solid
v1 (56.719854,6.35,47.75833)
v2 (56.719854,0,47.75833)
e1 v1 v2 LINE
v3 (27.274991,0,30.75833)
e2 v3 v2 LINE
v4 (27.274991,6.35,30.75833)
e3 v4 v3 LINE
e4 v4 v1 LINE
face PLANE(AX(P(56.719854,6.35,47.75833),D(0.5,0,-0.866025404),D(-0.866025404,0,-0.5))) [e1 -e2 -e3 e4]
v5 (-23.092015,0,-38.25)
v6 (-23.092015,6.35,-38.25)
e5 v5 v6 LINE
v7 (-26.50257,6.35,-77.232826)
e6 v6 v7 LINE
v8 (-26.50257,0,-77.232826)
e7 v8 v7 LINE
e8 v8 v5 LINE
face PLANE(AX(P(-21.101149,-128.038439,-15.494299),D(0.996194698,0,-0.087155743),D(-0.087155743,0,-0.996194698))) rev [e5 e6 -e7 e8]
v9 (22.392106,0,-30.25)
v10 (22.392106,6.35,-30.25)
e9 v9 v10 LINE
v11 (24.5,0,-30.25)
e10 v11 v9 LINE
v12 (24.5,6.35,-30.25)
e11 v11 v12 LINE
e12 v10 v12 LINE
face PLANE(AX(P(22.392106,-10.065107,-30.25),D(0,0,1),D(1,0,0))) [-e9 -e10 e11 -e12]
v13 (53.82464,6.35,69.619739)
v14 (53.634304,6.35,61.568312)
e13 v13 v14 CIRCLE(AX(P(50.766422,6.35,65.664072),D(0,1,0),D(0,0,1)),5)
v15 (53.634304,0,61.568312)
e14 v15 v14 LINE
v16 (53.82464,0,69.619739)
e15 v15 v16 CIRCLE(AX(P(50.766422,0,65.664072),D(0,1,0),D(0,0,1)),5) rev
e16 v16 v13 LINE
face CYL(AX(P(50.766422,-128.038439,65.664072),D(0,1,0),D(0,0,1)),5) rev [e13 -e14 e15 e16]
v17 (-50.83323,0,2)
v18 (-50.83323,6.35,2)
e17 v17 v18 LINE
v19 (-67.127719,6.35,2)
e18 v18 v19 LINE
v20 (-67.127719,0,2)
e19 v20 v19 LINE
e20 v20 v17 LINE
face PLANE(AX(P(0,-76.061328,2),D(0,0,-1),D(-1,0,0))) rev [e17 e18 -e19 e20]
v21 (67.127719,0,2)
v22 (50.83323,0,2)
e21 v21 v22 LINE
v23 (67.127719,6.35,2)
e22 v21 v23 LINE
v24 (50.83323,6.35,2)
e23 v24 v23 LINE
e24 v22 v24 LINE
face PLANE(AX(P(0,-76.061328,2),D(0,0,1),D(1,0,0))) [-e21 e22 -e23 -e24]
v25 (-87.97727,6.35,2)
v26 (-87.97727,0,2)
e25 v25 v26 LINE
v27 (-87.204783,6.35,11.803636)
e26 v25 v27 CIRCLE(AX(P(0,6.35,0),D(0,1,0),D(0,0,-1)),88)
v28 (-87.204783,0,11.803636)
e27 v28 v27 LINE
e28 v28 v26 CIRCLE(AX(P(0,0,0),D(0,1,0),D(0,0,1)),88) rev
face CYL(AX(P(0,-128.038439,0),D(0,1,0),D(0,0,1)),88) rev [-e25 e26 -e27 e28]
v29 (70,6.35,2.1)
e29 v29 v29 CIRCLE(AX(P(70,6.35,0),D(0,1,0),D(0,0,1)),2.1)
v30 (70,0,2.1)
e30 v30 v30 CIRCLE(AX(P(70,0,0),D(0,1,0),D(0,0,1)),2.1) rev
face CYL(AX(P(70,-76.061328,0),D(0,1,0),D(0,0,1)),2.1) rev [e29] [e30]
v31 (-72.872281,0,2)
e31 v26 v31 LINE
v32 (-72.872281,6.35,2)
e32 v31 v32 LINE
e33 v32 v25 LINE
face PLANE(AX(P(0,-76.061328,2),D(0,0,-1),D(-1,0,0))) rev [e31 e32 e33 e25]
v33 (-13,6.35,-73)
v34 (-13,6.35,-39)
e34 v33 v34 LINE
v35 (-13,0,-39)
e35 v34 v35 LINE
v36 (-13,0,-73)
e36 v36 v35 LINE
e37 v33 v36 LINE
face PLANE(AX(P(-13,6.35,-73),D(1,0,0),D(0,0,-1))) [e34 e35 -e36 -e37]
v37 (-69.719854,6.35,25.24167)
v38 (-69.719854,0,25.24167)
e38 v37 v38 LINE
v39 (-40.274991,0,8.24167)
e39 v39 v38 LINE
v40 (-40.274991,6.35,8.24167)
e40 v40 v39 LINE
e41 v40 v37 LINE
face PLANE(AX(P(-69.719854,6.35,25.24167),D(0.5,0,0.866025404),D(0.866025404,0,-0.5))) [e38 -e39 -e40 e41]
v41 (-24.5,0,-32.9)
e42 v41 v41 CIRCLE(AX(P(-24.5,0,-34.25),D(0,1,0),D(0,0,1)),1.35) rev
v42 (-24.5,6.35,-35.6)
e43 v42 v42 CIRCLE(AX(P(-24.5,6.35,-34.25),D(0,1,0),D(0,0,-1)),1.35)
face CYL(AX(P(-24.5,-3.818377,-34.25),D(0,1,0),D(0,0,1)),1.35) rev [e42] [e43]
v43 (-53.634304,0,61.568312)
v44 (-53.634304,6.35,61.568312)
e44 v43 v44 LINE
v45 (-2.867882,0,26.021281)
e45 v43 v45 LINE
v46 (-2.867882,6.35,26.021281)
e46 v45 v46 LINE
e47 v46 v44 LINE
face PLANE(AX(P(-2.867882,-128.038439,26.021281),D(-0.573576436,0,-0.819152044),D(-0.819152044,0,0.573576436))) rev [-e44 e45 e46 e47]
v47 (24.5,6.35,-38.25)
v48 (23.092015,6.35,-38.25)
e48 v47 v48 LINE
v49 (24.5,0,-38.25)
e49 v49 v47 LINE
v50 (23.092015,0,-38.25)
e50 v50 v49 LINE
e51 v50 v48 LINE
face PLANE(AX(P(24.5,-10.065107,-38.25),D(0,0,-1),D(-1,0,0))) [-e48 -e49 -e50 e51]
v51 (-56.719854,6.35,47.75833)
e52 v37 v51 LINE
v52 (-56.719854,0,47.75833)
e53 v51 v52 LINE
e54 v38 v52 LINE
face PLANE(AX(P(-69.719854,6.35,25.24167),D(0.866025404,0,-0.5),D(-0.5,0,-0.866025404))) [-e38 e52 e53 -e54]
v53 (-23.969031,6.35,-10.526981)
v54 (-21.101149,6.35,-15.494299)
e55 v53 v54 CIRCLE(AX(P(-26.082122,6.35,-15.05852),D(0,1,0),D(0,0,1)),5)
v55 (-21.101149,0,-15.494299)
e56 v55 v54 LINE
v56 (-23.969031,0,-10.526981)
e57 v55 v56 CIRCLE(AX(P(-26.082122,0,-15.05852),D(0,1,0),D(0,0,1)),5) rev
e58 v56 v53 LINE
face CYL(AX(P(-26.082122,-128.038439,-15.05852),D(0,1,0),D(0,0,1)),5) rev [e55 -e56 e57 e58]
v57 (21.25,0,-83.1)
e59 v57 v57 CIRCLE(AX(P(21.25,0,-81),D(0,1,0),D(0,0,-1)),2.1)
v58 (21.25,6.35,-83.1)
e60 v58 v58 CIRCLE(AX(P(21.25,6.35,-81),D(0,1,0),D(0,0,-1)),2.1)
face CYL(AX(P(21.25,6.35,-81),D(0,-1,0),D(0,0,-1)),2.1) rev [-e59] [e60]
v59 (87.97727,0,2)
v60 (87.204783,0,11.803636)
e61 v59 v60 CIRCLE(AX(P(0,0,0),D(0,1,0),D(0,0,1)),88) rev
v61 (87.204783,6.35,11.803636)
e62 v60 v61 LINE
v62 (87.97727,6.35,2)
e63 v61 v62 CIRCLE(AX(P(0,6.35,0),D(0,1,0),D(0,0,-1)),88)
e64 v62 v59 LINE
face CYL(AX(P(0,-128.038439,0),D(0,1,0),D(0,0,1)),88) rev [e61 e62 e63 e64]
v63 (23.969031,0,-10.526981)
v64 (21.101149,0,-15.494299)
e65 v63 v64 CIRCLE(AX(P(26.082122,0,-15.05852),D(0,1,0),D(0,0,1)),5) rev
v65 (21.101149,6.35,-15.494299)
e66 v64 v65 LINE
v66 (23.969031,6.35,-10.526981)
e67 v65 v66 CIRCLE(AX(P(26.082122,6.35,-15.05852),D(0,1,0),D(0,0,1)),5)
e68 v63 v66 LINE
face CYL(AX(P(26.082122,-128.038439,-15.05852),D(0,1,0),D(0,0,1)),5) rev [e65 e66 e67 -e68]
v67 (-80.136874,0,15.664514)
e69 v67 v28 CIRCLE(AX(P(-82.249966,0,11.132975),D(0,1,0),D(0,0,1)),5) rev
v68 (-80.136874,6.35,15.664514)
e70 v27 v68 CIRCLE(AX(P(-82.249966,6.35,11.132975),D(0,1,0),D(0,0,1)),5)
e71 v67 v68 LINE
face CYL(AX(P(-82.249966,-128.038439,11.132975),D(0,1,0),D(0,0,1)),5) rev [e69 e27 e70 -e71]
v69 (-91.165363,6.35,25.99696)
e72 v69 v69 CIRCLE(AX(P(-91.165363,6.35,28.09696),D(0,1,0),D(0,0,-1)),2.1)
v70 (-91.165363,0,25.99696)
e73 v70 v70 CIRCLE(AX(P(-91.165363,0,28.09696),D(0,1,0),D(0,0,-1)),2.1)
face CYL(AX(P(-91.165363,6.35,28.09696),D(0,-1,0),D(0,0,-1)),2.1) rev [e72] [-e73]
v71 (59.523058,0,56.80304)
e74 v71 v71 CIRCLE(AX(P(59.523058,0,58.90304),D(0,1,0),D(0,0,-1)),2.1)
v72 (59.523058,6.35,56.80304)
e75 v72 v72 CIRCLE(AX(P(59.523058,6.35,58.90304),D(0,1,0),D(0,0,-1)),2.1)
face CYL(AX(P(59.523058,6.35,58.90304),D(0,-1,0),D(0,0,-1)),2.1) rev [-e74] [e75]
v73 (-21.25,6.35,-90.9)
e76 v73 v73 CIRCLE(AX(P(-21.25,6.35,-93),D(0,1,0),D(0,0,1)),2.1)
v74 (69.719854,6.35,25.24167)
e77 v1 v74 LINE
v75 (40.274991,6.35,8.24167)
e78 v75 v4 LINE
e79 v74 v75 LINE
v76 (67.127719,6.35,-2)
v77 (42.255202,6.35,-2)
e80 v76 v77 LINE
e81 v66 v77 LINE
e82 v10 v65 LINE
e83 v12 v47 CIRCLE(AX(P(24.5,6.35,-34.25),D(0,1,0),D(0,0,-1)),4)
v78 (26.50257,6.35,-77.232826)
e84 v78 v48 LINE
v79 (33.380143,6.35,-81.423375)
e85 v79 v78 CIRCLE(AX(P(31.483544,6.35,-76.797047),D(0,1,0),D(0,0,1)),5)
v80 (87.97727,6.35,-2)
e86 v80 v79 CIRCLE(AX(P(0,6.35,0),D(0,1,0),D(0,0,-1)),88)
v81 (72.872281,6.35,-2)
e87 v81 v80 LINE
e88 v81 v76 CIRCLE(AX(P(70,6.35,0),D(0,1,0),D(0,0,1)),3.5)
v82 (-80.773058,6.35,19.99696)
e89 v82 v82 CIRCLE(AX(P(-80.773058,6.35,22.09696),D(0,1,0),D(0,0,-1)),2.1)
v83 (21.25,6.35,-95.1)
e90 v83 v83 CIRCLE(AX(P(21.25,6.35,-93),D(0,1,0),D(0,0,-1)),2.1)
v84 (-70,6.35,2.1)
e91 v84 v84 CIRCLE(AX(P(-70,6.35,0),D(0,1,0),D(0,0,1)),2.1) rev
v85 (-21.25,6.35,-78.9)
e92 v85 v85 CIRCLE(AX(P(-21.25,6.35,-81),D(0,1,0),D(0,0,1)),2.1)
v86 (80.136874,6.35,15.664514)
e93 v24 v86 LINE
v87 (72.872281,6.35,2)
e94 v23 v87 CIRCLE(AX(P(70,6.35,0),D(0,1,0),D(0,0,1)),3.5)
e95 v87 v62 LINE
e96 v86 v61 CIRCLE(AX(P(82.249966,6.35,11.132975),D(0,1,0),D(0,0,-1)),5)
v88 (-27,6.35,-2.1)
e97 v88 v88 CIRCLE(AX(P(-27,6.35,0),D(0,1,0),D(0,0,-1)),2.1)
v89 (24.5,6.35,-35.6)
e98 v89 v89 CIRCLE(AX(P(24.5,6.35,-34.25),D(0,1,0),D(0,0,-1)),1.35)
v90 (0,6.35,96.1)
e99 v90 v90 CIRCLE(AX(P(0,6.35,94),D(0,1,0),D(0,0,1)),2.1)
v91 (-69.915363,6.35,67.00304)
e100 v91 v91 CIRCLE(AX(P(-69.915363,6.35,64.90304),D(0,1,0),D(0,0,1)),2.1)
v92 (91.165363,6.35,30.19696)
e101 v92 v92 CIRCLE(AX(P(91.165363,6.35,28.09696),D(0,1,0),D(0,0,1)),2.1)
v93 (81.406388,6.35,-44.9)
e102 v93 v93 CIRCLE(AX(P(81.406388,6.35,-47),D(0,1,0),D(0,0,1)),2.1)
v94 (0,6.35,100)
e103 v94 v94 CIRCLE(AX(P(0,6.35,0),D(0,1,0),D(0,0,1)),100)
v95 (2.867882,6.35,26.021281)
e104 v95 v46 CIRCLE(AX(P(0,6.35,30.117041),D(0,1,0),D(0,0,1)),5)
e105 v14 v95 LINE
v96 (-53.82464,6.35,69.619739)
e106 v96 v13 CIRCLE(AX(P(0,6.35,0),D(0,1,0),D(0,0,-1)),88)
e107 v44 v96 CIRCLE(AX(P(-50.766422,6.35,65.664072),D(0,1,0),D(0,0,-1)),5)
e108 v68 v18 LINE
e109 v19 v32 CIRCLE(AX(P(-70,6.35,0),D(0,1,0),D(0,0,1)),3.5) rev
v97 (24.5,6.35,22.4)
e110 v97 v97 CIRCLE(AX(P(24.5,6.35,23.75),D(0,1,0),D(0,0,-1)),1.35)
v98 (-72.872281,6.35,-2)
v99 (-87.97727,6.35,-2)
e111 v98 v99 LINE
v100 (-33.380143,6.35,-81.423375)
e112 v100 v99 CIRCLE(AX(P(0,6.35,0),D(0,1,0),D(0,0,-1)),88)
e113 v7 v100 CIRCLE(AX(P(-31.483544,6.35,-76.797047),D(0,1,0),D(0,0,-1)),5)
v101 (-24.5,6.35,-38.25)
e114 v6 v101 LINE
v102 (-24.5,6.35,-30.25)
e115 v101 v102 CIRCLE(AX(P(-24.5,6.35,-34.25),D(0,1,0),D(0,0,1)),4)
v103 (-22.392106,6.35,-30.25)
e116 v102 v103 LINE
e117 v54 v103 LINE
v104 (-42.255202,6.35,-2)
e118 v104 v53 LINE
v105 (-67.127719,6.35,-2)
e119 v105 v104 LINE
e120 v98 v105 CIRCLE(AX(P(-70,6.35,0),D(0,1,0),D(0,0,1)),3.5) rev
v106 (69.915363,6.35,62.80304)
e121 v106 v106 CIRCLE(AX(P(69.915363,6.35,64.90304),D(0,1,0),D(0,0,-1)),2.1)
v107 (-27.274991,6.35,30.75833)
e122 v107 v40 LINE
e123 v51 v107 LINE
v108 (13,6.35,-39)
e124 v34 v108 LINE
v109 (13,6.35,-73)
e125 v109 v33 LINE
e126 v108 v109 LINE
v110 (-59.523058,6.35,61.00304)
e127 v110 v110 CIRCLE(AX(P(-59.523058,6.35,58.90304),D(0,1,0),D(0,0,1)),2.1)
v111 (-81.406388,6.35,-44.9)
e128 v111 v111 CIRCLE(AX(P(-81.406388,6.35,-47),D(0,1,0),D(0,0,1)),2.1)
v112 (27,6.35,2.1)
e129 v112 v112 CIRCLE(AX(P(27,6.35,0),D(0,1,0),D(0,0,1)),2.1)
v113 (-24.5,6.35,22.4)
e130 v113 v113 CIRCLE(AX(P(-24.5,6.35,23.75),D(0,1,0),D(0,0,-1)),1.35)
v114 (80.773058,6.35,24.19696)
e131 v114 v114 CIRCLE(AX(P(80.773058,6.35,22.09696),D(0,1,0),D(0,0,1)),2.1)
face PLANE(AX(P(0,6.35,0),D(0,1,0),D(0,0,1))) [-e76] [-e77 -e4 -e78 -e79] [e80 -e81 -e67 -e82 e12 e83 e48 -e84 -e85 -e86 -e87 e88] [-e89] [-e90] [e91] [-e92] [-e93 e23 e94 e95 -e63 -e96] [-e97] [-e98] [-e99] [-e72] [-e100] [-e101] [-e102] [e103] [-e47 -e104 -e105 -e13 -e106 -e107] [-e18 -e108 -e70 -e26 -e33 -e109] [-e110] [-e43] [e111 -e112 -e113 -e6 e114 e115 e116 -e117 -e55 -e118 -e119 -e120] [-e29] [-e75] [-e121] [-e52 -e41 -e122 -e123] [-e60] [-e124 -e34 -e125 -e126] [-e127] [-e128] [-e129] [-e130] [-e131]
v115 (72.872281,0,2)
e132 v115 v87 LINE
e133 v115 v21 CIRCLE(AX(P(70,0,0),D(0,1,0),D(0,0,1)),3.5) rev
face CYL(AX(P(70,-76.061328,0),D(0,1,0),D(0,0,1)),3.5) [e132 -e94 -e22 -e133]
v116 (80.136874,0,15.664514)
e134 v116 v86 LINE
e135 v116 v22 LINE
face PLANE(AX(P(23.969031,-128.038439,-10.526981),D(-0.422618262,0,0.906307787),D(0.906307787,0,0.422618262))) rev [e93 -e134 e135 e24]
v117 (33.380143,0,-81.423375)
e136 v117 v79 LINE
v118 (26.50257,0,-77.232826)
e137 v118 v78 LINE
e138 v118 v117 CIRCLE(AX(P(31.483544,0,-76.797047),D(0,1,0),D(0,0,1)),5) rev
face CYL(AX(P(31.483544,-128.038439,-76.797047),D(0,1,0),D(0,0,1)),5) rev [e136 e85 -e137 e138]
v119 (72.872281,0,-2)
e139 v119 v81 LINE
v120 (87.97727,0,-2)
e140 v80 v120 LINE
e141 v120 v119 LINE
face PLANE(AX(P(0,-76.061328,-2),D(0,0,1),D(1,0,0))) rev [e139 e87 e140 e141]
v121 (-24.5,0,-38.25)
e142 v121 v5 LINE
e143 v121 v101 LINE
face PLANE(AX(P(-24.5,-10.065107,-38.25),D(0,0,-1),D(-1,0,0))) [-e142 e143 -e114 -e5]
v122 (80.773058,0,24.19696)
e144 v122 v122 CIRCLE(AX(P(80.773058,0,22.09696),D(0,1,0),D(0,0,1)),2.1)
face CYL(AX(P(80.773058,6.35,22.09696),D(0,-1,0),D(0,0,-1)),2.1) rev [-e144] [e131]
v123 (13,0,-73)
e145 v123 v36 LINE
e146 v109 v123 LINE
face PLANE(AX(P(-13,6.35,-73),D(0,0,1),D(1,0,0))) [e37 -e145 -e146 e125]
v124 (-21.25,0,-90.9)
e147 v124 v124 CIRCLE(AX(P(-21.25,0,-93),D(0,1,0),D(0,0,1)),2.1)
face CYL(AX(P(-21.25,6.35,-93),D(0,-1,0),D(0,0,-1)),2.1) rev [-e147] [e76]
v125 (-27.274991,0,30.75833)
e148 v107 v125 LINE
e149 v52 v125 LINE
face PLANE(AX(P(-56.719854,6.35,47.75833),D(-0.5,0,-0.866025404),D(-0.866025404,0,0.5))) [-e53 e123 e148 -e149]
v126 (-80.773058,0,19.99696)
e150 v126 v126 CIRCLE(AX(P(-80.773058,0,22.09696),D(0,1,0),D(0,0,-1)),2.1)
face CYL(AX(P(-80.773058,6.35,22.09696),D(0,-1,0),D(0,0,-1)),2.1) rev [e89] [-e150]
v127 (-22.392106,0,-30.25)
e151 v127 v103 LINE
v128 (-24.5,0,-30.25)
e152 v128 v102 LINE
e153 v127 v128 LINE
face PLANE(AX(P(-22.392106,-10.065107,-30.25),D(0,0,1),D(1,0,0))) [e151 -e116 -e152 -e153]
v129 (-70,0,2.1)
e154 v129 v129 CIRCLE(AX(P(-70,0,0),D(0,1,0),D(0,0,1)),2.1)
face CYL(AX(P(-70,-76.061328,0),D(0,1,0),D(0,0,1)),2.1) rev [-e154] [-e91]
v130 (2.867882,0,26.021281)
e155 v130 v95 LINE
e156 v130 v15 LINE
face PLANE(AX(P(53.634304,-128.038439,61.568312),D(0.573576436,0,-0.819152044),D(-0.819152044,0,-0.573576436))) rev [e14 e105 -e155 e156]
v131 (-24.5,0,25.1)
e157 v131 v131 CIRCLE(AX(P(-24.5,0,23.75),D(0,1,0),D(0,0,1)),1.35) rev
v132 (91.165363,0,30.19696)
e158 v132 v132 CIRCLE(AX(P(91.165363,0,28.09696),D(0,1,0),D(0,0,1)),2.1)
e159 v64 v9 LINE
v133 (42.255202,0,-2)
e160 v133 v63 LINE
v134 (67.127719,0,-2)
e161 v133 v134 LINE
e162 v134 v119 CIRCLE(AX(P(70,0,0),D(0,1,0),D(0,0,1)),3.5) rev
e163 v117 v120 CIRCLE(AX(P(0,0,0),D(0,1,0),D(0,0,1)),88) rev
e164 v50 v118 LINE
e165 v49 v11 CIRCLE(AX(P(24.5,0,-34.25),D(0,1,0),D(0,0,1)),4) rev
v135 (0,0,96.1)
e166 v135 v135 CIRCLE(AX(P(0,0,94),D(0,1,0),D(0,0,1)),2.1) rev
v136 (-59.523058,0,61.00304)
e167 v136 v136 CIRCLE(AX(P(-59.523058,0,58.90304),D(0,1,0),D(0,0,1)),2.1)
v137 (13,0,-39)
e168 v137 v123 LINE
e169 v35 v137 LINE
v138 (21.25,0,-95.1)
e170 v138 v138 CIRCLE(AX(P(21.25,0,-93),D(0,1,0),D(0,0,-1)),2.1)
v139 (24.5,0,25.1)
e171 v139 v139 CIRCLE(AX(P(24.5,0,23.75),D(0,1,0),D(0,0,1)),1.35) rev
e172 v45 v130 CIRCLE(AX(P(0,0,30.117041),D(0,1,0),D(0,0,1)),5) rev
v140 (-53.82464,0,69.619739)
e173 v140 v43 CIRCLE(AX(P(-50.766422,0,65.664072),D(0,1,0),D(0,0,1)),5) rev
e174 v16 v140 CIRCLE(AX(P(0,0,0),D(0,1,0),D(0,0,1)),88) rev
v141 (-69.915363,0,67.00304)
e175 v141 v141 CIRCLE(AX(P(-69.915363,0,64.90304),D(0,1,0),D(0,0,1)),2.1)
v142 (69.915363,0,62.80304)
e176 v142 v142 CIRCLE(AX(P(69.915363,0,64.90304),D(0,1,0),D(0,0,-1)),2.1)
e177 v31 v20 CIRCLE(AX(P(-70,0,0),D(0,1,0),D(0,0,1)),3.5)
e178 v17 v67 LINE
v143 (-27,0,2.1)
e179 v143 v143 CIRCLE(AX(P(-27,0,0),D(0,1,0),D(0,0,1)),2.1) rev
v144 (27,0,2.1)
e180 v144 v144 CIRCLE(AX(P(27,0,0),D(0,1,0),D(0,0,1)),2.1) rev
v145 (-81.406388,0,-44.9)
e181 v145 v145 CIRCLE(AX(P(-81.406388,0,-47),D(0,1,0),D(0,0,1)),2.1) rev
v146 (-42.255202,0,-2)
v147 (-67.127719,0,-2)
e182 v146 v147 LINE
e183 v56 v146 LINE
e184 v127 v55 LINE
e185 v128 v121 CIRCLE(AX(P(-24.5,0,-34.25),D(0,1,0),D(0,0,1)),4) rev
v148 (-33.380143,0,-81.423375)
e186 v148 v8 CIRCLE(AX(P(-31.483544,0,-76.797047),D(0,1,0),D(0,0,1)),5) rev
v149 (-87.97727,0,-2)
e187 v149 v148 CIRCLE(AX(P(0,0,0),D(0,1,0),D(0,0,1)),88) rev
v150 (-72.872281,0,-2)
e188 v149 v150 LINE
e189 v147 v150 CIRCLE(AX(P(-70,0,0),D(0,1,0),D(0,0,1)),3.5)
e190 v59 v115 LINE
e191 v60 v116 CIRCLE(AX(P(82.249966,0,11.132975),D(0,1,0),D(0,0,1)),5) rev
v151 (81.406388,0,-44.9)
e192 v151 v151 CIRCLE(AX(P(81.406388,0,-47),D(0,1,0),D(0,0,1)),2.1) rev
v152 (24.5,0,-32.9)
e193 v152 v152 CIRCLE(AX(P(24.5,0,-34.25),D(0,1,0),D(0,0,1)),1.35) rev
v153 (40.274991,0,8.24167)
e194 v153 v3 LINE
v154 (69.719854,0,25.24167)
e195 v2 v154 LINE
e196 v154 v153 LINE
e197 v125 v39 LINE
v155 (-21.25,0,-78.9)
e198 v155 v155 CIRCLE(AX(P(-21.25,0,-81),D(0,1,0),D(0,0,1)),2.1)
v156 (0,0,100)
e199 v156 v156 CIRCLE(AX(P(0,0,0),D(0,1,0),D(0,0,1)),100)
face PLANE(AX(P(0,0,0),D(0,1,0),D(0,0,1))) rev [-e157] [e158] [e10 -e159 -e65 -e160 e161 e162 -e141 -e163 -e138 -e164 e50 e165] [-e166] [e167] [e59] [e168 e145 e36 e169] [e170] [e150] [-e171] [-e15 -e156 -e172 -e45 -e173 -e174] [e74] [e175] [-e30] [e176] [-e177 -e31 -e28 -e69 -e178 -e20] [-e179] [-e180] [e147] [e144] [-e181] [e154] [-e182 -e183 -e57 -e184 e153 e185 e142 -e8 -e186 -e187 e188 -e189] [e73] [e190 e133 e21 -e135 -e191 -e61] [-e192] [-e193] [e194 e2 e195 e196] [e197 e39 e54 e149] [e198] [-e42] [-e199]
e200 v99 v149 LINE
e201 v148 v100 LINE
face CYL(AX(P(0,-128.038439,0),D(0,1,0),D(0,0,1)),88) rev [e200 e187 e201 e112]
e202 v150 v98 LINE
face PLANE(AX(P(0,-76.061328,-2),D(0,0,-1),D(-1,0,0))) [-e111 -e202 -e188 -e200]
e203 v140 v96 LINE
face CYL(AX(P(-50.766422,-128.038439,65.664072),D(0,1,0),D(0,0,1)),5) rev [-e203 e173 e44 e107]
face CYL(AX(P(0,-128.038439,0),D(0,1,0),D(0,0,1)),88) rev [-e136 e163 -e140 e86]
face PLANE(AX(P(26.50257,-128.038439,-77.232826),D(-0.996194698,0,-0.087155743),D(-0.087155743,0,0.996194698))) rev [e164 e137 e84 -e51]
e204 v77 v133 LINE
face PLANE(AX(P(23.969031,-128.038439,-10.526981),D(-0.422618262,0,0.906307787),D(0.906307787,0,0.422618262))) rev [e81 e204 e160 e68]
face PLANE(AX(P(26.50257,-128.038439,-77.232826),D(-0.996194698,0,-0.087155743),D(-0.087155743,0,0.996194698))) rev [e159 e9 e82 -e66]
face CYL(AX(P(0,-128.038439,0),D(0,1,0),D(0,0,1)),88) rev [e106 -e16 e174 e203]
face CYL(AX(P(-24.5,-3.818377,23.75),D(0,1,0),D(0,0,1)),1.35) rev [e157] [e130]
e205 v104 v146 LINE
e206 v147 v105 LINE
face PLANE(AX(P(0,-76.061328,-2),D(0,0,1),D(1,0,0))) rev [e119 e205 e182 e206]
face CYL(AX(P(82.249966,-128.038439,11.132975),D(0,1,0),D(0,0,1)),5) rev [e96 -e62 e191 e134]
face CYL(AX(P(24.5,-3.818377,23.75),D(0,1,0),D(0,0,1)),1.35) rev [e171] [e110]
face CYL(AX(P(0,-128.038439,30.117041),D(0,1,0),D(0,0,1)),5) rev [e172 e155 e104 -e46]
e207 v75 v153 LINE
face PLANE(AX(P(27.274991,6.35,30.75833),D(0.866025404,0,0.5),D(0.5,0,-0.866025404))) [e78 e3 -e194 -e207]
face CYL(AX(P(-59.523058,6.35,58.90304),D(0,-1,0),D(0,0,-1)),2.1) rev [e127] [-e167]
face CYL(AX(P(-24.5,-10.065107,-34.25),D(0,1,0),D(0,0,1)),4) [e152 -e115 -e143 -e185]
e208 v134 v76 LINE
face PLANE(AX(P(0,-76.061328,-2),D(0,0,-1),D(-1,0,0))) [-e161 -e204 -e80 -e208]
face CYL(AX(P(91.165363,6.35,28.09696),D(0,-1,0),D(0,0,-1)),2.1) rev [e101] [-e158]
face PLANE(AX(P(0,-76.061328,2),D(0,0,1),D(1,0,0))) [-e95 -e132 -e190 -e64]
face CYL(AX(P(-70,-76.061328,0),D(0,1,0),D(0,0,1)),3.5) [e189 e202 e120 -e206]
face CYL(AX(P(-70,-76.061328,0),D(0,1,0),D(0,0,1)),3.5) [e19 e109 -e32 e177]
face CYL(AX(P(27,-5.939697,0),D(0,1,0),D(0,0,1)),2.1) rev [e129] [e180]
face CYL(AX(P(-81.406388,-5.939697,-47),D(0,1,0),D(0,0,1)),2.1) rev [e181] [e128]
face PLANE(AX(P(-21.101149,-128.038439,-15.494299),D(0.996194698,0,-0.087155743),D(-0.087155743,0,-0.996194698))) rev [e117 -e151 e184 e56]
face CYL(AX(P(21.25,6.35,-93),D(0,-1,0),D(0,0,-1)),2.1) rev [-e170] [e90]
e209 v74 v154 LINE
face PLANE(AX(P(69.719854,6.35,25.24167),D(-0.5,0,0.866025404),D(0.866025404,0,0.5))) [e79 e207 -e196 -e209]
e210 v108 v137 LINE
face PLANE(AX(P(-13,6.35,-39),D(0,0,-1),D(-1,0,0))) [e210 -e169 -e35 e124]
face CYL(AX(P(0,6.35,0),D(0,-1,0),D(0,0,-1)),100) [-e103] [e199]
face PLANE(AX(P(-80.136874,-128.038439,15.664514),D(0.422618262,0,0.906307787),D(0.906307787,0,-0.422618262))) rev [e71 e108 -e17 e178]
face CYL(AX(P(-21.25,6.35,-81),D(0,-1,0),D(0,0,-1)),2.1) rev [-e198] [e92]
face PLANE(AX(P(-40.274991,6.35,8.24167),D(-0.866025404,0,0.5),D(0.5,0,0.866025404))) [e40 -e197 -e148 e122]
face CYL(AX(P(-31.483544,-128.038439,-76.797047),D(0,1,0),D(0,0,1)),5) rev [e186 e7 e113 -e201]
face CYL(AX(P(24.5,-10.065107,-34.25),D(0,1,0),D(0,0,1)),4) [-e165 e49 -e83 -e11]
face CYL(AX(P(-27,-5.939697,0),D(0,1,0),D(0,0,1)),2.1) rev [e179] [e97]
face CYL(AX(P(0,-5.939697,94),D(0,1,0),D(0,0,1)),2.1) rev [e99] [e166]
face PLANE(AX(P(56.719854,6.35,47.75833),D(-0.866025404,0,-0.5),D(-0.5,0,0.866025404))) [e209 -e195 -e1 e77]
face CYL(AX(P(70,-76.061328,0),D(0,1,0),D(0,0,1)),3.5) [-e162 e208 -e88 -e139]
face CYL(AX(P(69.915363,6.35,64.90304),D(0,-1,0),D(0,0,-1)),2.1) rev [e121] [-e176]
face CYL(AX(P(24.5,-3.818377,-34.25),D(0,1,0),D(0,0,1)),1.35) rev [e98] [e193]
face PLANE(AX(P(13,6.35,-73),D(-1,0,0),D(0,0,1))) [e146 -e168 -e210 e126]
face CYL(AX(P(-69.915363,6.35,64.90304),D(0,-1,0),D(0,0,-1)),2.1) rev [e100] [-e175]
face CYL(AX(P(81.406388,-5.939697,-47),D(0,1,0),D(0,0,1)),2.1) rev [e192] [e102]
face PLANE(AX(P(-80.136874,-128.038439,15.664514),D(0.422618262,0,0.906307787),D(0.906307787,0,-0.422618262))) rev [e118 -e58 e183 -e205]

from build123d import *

# Parameters (mm, degrees)
BOSS_EXTRUDE1_OUTLINE_R   = 100
BOSS_EXTRUDE1_OUTLINE_R_2 = 2.1
BOSS_EXTRUDE1_OUTLINE_W   = 26
BOSS_EXTRUDE1_OUTLINE_H   = 34
BOSS_EXTRUDE1_DEPTH       = 6.35
SKETCH2_R                 = 2.1
CUT_EXTRUDE1_DEPTH        = 6.35
CUT_EXTRUDE4_DEPTH        = 6.35
BOSS_EXTRUDE2_DEPTH       = 6.35
SKETCH4_R                 = 1.35
CUT_EXTRUDE3_DEPTH        = 6.35
SKETCH7_R                 = 2.1
BOSS_EXTRUDE3_DEPTH       = 6.35
SKETCH8_R                 = 2.1
CUT_EXTRUDE5_DEPTH        = 6.35


# Read off the part's stored shape, not the designer's step: Boss-Extrude1
with BuildPart() as part:
    # Boss-Extrude1 outline → Boss-Extrude1 (new body)
    with BuildSketch(Plane(origin=(0, 0, 0), x_dir=(1, 0, 0), z_dir=(0, 1, 0))):
        Circle(BOSS_EXTRUDE1_OUTLINE_R)
        with Locations((-69.915362552, -64.90303983)):
            Circle(BOSS_EXTRUDE1_OUTLINE_R_2, mode=Mode.SUBTRACT)
        with Locations((-59.523057707, -58.90303983)):
            Circle(BOSS_EXTRUDE1_OUTLINE_R_2, mode=Mode.SUBTRACT)
        with Locations((-91.165362552, -28.09696017)):
            Circle(BOSS_EXTRUDE1_OUTLINE_R_2, mode=Mode.SUBTRACT)
        with Locations((-80.773057707, -22.09696017)):
            Circle(BOSS_EXTRUDE1_OUTLINE_R_2, mode=Mode.SUBTRACT)
        Polygon((-56.719854476, -47.758330249), (-69.719854476, -25.241669751), (-40.274990748, -8.241669751), (-27.274990748, -30.758330249), align=None, mode=Mode.SUBTRACT)
        with Locations((69.915362552, -64.90303983)):
            Circle(BOSS_EXTRUDE1_OUTLINE_R_2, mode=Mode.SUBTRACT)
        with Locations((59.523057707, -58.90303983)):
            Circle(BOSS_EXTRUDE1_OUTLINE_R_2, mode=Mode.SUBTRACT)
        Polygon((69.719854476, -25.241669751), (56.719854476, -47.758330249), (27.274990748, -30.758330249), (40.274990748, -8.241669751), align=None, mode=Mode.SUBTRACT)
        with Locations((91.165362552, -28.09696017)):
            Circle(BOSS_EXTRUDE1_OUTLINE_R_2, mode=Mode.SUBTRACT)
        with Locations((80.773057707, -22.09696017)):
            Circle(BOSS_EXTRUDE1_OUTLINE_R_2, mode=Mode.SUBTRACT)
        with Locations((-21.25, 81)):
            Circle(BOSS_EXTRUDE1_OUTLINE_R_2, mode=Mode.SUBTRACT)
        with Locations((-21.25, 93)):
            Circle(BOSS_EXTRUDE1_OUTLINE_R_2, mode=Mode.SUBTRACT)
        with Locations((0, 56)):
            Rectangle(BOSS_EXTRUDE1_OUTLINE_W, BOSS_EXTRUDE1_OUTLINE_H, mode=Mode.SUBTRACT)
        with Locations((21.25, 81)):
            Circle(BOSS_EXTRUDE1_OUTLINE_R_2, mode=Mode.SUBTRACT)
        with Locations((21.25, 93)):
            Circle(BOSS_EXTRUDE1_OUTLINE_R_2, mode=Mode.SUBTRACT)
    extrude(amount=BOSS_EXTRUDE1_DEPTH)

    # Sketch2 → Cut-Extrude1 (cut)
    with BuildSketch(Plane(origin=(0, 6.35, 0), x_dir=(1, 0, 0), z_dir=(0, 1, 0))):
        with Locations(Location((0, -94, 0), (0, 0, 270))):
            Circle(SKETCH2_R)
        with Locations(Location((-81.406387956, 47, 0), (0, 0, 270))):
            Circle(SKETCH2_R)
        with Locations(Location((81.406387956, 47, 0), (0, 0, 270))):
            Circle(SKETCH2_R)
    extrude(amount=-CUT_EXTRUDE1_DEPTH, mode=Mode.SUBTRACT)

    # Sketch5 → Cut-Extrude4 (cut)
    with BuildSketch(Plane(origin=(0, 6.35, 0), x_dir=(1, 0, 0), z_dir=(0, 1, 0))):
        with BuildLine():
            Line((26.502570178, 77.23282604), (21.101148971, 15.494299138))
            ThreePointArc((21.101148971, 15.494299138), (21.751995443, 12.558520424), (23.969031153, 10.526981489))
            Line((23.969031153, 10.526981489), (80.136874446, -15.664513981))
            ThreePointArc((80.136874446, -15.664513981), (84.646931723, -15.520976202), (87.204782969, -11.803636193))
            ThreePointArc((87.204782969, -11.803636193), (76.210235533, 44), (33.380142684, 81.423375479))
            ThreePointArc((33.380142684, 81.423375479), (28.881906179, 81.066881325), (26.502570178, 77.23282604))
        make_face()
        with BuildLine():
            Line((53.634304268, -61.56831206), (2.867882182, -26.021280627))
            ThreePointArc((2.867882182, -26.021280627), (0, -25.117040848), (-2.867882182, -26.021280627))
            Line((-2.867882182, -26.021280627), (-53.634304268, -61.56831206))
            ThreePointArc((-53.634304268, -61.56831206), (-55.765025544, -65.545905124), (-53.824640284, -69.619739286))
            ThreePointArc((-53.824640284, -69.619739286), (0, -88), (53.824640284, -69.619739286))
            ThreePointArc((53.824640284, -69.619739286), (55.765025544, -65.545905124), (53.634304268, -61.56831206))
        make_face()
        with BuildLine():
            Line((-80.136874446, -15.664513981), (-23.969031153, 10.526981489))
            ThreePointArc((-23.969031153, 10.526981489), (-21.751995443, 12.558520424), (-21.101148971, 15.494299138))
            Line((-21.101148971, 15.494299138), (-26.502570178, 77.23282604))
            ThreePointArc((-26.502570178, 77.23282604), (-28.881906179, 81.066881325), (-33.380142684, 81.423375479))
            ThreePointArc((-33.380142684, 81.423375479), (-76.210235533, 44), (-87.204782969, -11.803636193))
            ThreePointArc((-87.204782969, -11.803636193), (-84.646931723, -15.520976202), (-80.136874446, -15.664513981))
        make_face()
    extrude(amount=-CUT_EXTRUDE4_DEPTH, mode=Mode.SUBTRACT)

    # Sketch6 → Boss-Extrude2 (add)
    with BuildSketch(Plane(origin=(0, 6.35, 0), x_dir=(1, 0, 0), z_dir=(0, 1, 0))):
        with BuildLine():
            Line((-24.5, 38.25), (-23.092014827, 38.25))
            Line((-23.092014827, 38.25), (-22.392105519, 30.25))
            Line((-22.392105519, 30.25), (-24.5, 30.25))
            ThreePointArc((-24.5, 30.25), (-28.5, 34.25), (-24.5, 38.25))
        make_face()
        with BuildLine():
            Line((22.392105519, 30.25), (24.5, 30.25))
            ThreePointArc((24.5, 30.25), (28.5, 34.25), (24.5, 38.25))
            Line((24.5, 38.25), (23.092014827, 38.25))
            Line((23.092014827, 38.25), (22.392105519, 30.25))
        make_face()
    extrude(amount=-BOSS_EXTRUDE2_DEPTH)

    # Sketch4 → Cut-Extrude3 (cut)
    with BuildSketch(Plane(origin=(0, 6.35, 0), x_dir=(1, 0, 0), z_dir=(0, 1, 0))):
        with Locations(Location((-24.5, -23.75, 0), (0, 0, 270))):
            Circle(SKETCH4_R)
        with Locations(Location((24.5, -23.75, 0), (0, 0, 270))):
            Circle(SKETCH4_R)
        with Locations(Location((24.5, 34.25, 0), (0, 0, 270))):
            Circle(SKETCH4_R)
        with Locations(Location((-24.5, 34.25, 0), (0, 0, 270))):
            Circle(SKETCH4_R)
    extrude(amount=-CUT_EXTRUDE3_DEPTH, mode=Mode.SUBTRACT)

    # Sketch7 → Boss-Extrude3 (add)
    # profile 1 of 2: a face of its own
    with BuildSketch(Plane(origin=(0, 6.35, 0), x_dir=(1, 0, 0), z_dir=(0, 1, 0))):
        with BuildLine():
            Line((67.127718677, 2), (17.894755671, 2))
            Line((17.894755671, 2), (17.894755671, -2))
            Line((17.894755671, -2), (67.127718677, -2))
            ThreePointArc((67.127718677, -2), (70, -3.5), (72.872281323, -2))
            Line((72.872281323, -2), (93.633289792, -2))
            Line((93.633289792, -2), (93.633289792, 2))
            Line((93.633289792, 2), (72.872281323, 2))
            ThreePointArc((72.872281323, 2), (70, 3.5), (67.127718677, 2))
        make_face()
        with Locations(Location((70, 0, 0), (0, 0, 270))):
            Circle(SKETCH7_R, mode=Mode.SUBTRACT)
    # profile 2 of 2: a face of its own
    with BuildSketch(Plane(origin=(0, 6.35, 0), x_dir=(1, 0, 0), z_dir=(0, 1, 0))):
        with BuildLine():
            Line((-72.872281323, -2), (-93.633289792, -2))
            Line((-93.633289792, -2), (-93.633289792, 2))
            Line((-93.633289792, 2), (-72.872281323, 2))
            ThreePointArc((-72.872281323, 2), (-70, 3.5), (-67.127718677, 2))
            Line((-67.127718677, 2), (-17.894755671, 2))
            Line((-17.894755671, 2), (-17.894755671, -2))
            Line((-17.894755671, -2), (-67.127718677, -2))
            ThreePointArc((-67.127718677, -2), (-70, -3.5), (-72.872281323, -2))
        make_face()
        with Locations(Location((-70, 0, 0), (0, 0, 270))):
            Circle(SKETCH7_R, mode=Mode.SUBTRACT)
    extrude(amount=-BOSS_EXTRUDE3_DEPTH)

    # Sketch8 → Cut-Extrude5 (cut)
    with BuildSketch(Plane(origin=(0, 6.35, 0), x_dir=(1, 0, 0), z_dir=(0, 1, 0))):
        with Locations(Location((27, 0, 0), (0, 0, 270))):
            Circle(SKETCH8_R)
        with Locations(Location((-27, 0, 0), (0, 0, 270))):
            Circle(SKETCH8_R)
    extrude(amount=-CUT_EXTRUDE5_DEPTH, mode=Mode.SUBTRACT)


solid = part.part
